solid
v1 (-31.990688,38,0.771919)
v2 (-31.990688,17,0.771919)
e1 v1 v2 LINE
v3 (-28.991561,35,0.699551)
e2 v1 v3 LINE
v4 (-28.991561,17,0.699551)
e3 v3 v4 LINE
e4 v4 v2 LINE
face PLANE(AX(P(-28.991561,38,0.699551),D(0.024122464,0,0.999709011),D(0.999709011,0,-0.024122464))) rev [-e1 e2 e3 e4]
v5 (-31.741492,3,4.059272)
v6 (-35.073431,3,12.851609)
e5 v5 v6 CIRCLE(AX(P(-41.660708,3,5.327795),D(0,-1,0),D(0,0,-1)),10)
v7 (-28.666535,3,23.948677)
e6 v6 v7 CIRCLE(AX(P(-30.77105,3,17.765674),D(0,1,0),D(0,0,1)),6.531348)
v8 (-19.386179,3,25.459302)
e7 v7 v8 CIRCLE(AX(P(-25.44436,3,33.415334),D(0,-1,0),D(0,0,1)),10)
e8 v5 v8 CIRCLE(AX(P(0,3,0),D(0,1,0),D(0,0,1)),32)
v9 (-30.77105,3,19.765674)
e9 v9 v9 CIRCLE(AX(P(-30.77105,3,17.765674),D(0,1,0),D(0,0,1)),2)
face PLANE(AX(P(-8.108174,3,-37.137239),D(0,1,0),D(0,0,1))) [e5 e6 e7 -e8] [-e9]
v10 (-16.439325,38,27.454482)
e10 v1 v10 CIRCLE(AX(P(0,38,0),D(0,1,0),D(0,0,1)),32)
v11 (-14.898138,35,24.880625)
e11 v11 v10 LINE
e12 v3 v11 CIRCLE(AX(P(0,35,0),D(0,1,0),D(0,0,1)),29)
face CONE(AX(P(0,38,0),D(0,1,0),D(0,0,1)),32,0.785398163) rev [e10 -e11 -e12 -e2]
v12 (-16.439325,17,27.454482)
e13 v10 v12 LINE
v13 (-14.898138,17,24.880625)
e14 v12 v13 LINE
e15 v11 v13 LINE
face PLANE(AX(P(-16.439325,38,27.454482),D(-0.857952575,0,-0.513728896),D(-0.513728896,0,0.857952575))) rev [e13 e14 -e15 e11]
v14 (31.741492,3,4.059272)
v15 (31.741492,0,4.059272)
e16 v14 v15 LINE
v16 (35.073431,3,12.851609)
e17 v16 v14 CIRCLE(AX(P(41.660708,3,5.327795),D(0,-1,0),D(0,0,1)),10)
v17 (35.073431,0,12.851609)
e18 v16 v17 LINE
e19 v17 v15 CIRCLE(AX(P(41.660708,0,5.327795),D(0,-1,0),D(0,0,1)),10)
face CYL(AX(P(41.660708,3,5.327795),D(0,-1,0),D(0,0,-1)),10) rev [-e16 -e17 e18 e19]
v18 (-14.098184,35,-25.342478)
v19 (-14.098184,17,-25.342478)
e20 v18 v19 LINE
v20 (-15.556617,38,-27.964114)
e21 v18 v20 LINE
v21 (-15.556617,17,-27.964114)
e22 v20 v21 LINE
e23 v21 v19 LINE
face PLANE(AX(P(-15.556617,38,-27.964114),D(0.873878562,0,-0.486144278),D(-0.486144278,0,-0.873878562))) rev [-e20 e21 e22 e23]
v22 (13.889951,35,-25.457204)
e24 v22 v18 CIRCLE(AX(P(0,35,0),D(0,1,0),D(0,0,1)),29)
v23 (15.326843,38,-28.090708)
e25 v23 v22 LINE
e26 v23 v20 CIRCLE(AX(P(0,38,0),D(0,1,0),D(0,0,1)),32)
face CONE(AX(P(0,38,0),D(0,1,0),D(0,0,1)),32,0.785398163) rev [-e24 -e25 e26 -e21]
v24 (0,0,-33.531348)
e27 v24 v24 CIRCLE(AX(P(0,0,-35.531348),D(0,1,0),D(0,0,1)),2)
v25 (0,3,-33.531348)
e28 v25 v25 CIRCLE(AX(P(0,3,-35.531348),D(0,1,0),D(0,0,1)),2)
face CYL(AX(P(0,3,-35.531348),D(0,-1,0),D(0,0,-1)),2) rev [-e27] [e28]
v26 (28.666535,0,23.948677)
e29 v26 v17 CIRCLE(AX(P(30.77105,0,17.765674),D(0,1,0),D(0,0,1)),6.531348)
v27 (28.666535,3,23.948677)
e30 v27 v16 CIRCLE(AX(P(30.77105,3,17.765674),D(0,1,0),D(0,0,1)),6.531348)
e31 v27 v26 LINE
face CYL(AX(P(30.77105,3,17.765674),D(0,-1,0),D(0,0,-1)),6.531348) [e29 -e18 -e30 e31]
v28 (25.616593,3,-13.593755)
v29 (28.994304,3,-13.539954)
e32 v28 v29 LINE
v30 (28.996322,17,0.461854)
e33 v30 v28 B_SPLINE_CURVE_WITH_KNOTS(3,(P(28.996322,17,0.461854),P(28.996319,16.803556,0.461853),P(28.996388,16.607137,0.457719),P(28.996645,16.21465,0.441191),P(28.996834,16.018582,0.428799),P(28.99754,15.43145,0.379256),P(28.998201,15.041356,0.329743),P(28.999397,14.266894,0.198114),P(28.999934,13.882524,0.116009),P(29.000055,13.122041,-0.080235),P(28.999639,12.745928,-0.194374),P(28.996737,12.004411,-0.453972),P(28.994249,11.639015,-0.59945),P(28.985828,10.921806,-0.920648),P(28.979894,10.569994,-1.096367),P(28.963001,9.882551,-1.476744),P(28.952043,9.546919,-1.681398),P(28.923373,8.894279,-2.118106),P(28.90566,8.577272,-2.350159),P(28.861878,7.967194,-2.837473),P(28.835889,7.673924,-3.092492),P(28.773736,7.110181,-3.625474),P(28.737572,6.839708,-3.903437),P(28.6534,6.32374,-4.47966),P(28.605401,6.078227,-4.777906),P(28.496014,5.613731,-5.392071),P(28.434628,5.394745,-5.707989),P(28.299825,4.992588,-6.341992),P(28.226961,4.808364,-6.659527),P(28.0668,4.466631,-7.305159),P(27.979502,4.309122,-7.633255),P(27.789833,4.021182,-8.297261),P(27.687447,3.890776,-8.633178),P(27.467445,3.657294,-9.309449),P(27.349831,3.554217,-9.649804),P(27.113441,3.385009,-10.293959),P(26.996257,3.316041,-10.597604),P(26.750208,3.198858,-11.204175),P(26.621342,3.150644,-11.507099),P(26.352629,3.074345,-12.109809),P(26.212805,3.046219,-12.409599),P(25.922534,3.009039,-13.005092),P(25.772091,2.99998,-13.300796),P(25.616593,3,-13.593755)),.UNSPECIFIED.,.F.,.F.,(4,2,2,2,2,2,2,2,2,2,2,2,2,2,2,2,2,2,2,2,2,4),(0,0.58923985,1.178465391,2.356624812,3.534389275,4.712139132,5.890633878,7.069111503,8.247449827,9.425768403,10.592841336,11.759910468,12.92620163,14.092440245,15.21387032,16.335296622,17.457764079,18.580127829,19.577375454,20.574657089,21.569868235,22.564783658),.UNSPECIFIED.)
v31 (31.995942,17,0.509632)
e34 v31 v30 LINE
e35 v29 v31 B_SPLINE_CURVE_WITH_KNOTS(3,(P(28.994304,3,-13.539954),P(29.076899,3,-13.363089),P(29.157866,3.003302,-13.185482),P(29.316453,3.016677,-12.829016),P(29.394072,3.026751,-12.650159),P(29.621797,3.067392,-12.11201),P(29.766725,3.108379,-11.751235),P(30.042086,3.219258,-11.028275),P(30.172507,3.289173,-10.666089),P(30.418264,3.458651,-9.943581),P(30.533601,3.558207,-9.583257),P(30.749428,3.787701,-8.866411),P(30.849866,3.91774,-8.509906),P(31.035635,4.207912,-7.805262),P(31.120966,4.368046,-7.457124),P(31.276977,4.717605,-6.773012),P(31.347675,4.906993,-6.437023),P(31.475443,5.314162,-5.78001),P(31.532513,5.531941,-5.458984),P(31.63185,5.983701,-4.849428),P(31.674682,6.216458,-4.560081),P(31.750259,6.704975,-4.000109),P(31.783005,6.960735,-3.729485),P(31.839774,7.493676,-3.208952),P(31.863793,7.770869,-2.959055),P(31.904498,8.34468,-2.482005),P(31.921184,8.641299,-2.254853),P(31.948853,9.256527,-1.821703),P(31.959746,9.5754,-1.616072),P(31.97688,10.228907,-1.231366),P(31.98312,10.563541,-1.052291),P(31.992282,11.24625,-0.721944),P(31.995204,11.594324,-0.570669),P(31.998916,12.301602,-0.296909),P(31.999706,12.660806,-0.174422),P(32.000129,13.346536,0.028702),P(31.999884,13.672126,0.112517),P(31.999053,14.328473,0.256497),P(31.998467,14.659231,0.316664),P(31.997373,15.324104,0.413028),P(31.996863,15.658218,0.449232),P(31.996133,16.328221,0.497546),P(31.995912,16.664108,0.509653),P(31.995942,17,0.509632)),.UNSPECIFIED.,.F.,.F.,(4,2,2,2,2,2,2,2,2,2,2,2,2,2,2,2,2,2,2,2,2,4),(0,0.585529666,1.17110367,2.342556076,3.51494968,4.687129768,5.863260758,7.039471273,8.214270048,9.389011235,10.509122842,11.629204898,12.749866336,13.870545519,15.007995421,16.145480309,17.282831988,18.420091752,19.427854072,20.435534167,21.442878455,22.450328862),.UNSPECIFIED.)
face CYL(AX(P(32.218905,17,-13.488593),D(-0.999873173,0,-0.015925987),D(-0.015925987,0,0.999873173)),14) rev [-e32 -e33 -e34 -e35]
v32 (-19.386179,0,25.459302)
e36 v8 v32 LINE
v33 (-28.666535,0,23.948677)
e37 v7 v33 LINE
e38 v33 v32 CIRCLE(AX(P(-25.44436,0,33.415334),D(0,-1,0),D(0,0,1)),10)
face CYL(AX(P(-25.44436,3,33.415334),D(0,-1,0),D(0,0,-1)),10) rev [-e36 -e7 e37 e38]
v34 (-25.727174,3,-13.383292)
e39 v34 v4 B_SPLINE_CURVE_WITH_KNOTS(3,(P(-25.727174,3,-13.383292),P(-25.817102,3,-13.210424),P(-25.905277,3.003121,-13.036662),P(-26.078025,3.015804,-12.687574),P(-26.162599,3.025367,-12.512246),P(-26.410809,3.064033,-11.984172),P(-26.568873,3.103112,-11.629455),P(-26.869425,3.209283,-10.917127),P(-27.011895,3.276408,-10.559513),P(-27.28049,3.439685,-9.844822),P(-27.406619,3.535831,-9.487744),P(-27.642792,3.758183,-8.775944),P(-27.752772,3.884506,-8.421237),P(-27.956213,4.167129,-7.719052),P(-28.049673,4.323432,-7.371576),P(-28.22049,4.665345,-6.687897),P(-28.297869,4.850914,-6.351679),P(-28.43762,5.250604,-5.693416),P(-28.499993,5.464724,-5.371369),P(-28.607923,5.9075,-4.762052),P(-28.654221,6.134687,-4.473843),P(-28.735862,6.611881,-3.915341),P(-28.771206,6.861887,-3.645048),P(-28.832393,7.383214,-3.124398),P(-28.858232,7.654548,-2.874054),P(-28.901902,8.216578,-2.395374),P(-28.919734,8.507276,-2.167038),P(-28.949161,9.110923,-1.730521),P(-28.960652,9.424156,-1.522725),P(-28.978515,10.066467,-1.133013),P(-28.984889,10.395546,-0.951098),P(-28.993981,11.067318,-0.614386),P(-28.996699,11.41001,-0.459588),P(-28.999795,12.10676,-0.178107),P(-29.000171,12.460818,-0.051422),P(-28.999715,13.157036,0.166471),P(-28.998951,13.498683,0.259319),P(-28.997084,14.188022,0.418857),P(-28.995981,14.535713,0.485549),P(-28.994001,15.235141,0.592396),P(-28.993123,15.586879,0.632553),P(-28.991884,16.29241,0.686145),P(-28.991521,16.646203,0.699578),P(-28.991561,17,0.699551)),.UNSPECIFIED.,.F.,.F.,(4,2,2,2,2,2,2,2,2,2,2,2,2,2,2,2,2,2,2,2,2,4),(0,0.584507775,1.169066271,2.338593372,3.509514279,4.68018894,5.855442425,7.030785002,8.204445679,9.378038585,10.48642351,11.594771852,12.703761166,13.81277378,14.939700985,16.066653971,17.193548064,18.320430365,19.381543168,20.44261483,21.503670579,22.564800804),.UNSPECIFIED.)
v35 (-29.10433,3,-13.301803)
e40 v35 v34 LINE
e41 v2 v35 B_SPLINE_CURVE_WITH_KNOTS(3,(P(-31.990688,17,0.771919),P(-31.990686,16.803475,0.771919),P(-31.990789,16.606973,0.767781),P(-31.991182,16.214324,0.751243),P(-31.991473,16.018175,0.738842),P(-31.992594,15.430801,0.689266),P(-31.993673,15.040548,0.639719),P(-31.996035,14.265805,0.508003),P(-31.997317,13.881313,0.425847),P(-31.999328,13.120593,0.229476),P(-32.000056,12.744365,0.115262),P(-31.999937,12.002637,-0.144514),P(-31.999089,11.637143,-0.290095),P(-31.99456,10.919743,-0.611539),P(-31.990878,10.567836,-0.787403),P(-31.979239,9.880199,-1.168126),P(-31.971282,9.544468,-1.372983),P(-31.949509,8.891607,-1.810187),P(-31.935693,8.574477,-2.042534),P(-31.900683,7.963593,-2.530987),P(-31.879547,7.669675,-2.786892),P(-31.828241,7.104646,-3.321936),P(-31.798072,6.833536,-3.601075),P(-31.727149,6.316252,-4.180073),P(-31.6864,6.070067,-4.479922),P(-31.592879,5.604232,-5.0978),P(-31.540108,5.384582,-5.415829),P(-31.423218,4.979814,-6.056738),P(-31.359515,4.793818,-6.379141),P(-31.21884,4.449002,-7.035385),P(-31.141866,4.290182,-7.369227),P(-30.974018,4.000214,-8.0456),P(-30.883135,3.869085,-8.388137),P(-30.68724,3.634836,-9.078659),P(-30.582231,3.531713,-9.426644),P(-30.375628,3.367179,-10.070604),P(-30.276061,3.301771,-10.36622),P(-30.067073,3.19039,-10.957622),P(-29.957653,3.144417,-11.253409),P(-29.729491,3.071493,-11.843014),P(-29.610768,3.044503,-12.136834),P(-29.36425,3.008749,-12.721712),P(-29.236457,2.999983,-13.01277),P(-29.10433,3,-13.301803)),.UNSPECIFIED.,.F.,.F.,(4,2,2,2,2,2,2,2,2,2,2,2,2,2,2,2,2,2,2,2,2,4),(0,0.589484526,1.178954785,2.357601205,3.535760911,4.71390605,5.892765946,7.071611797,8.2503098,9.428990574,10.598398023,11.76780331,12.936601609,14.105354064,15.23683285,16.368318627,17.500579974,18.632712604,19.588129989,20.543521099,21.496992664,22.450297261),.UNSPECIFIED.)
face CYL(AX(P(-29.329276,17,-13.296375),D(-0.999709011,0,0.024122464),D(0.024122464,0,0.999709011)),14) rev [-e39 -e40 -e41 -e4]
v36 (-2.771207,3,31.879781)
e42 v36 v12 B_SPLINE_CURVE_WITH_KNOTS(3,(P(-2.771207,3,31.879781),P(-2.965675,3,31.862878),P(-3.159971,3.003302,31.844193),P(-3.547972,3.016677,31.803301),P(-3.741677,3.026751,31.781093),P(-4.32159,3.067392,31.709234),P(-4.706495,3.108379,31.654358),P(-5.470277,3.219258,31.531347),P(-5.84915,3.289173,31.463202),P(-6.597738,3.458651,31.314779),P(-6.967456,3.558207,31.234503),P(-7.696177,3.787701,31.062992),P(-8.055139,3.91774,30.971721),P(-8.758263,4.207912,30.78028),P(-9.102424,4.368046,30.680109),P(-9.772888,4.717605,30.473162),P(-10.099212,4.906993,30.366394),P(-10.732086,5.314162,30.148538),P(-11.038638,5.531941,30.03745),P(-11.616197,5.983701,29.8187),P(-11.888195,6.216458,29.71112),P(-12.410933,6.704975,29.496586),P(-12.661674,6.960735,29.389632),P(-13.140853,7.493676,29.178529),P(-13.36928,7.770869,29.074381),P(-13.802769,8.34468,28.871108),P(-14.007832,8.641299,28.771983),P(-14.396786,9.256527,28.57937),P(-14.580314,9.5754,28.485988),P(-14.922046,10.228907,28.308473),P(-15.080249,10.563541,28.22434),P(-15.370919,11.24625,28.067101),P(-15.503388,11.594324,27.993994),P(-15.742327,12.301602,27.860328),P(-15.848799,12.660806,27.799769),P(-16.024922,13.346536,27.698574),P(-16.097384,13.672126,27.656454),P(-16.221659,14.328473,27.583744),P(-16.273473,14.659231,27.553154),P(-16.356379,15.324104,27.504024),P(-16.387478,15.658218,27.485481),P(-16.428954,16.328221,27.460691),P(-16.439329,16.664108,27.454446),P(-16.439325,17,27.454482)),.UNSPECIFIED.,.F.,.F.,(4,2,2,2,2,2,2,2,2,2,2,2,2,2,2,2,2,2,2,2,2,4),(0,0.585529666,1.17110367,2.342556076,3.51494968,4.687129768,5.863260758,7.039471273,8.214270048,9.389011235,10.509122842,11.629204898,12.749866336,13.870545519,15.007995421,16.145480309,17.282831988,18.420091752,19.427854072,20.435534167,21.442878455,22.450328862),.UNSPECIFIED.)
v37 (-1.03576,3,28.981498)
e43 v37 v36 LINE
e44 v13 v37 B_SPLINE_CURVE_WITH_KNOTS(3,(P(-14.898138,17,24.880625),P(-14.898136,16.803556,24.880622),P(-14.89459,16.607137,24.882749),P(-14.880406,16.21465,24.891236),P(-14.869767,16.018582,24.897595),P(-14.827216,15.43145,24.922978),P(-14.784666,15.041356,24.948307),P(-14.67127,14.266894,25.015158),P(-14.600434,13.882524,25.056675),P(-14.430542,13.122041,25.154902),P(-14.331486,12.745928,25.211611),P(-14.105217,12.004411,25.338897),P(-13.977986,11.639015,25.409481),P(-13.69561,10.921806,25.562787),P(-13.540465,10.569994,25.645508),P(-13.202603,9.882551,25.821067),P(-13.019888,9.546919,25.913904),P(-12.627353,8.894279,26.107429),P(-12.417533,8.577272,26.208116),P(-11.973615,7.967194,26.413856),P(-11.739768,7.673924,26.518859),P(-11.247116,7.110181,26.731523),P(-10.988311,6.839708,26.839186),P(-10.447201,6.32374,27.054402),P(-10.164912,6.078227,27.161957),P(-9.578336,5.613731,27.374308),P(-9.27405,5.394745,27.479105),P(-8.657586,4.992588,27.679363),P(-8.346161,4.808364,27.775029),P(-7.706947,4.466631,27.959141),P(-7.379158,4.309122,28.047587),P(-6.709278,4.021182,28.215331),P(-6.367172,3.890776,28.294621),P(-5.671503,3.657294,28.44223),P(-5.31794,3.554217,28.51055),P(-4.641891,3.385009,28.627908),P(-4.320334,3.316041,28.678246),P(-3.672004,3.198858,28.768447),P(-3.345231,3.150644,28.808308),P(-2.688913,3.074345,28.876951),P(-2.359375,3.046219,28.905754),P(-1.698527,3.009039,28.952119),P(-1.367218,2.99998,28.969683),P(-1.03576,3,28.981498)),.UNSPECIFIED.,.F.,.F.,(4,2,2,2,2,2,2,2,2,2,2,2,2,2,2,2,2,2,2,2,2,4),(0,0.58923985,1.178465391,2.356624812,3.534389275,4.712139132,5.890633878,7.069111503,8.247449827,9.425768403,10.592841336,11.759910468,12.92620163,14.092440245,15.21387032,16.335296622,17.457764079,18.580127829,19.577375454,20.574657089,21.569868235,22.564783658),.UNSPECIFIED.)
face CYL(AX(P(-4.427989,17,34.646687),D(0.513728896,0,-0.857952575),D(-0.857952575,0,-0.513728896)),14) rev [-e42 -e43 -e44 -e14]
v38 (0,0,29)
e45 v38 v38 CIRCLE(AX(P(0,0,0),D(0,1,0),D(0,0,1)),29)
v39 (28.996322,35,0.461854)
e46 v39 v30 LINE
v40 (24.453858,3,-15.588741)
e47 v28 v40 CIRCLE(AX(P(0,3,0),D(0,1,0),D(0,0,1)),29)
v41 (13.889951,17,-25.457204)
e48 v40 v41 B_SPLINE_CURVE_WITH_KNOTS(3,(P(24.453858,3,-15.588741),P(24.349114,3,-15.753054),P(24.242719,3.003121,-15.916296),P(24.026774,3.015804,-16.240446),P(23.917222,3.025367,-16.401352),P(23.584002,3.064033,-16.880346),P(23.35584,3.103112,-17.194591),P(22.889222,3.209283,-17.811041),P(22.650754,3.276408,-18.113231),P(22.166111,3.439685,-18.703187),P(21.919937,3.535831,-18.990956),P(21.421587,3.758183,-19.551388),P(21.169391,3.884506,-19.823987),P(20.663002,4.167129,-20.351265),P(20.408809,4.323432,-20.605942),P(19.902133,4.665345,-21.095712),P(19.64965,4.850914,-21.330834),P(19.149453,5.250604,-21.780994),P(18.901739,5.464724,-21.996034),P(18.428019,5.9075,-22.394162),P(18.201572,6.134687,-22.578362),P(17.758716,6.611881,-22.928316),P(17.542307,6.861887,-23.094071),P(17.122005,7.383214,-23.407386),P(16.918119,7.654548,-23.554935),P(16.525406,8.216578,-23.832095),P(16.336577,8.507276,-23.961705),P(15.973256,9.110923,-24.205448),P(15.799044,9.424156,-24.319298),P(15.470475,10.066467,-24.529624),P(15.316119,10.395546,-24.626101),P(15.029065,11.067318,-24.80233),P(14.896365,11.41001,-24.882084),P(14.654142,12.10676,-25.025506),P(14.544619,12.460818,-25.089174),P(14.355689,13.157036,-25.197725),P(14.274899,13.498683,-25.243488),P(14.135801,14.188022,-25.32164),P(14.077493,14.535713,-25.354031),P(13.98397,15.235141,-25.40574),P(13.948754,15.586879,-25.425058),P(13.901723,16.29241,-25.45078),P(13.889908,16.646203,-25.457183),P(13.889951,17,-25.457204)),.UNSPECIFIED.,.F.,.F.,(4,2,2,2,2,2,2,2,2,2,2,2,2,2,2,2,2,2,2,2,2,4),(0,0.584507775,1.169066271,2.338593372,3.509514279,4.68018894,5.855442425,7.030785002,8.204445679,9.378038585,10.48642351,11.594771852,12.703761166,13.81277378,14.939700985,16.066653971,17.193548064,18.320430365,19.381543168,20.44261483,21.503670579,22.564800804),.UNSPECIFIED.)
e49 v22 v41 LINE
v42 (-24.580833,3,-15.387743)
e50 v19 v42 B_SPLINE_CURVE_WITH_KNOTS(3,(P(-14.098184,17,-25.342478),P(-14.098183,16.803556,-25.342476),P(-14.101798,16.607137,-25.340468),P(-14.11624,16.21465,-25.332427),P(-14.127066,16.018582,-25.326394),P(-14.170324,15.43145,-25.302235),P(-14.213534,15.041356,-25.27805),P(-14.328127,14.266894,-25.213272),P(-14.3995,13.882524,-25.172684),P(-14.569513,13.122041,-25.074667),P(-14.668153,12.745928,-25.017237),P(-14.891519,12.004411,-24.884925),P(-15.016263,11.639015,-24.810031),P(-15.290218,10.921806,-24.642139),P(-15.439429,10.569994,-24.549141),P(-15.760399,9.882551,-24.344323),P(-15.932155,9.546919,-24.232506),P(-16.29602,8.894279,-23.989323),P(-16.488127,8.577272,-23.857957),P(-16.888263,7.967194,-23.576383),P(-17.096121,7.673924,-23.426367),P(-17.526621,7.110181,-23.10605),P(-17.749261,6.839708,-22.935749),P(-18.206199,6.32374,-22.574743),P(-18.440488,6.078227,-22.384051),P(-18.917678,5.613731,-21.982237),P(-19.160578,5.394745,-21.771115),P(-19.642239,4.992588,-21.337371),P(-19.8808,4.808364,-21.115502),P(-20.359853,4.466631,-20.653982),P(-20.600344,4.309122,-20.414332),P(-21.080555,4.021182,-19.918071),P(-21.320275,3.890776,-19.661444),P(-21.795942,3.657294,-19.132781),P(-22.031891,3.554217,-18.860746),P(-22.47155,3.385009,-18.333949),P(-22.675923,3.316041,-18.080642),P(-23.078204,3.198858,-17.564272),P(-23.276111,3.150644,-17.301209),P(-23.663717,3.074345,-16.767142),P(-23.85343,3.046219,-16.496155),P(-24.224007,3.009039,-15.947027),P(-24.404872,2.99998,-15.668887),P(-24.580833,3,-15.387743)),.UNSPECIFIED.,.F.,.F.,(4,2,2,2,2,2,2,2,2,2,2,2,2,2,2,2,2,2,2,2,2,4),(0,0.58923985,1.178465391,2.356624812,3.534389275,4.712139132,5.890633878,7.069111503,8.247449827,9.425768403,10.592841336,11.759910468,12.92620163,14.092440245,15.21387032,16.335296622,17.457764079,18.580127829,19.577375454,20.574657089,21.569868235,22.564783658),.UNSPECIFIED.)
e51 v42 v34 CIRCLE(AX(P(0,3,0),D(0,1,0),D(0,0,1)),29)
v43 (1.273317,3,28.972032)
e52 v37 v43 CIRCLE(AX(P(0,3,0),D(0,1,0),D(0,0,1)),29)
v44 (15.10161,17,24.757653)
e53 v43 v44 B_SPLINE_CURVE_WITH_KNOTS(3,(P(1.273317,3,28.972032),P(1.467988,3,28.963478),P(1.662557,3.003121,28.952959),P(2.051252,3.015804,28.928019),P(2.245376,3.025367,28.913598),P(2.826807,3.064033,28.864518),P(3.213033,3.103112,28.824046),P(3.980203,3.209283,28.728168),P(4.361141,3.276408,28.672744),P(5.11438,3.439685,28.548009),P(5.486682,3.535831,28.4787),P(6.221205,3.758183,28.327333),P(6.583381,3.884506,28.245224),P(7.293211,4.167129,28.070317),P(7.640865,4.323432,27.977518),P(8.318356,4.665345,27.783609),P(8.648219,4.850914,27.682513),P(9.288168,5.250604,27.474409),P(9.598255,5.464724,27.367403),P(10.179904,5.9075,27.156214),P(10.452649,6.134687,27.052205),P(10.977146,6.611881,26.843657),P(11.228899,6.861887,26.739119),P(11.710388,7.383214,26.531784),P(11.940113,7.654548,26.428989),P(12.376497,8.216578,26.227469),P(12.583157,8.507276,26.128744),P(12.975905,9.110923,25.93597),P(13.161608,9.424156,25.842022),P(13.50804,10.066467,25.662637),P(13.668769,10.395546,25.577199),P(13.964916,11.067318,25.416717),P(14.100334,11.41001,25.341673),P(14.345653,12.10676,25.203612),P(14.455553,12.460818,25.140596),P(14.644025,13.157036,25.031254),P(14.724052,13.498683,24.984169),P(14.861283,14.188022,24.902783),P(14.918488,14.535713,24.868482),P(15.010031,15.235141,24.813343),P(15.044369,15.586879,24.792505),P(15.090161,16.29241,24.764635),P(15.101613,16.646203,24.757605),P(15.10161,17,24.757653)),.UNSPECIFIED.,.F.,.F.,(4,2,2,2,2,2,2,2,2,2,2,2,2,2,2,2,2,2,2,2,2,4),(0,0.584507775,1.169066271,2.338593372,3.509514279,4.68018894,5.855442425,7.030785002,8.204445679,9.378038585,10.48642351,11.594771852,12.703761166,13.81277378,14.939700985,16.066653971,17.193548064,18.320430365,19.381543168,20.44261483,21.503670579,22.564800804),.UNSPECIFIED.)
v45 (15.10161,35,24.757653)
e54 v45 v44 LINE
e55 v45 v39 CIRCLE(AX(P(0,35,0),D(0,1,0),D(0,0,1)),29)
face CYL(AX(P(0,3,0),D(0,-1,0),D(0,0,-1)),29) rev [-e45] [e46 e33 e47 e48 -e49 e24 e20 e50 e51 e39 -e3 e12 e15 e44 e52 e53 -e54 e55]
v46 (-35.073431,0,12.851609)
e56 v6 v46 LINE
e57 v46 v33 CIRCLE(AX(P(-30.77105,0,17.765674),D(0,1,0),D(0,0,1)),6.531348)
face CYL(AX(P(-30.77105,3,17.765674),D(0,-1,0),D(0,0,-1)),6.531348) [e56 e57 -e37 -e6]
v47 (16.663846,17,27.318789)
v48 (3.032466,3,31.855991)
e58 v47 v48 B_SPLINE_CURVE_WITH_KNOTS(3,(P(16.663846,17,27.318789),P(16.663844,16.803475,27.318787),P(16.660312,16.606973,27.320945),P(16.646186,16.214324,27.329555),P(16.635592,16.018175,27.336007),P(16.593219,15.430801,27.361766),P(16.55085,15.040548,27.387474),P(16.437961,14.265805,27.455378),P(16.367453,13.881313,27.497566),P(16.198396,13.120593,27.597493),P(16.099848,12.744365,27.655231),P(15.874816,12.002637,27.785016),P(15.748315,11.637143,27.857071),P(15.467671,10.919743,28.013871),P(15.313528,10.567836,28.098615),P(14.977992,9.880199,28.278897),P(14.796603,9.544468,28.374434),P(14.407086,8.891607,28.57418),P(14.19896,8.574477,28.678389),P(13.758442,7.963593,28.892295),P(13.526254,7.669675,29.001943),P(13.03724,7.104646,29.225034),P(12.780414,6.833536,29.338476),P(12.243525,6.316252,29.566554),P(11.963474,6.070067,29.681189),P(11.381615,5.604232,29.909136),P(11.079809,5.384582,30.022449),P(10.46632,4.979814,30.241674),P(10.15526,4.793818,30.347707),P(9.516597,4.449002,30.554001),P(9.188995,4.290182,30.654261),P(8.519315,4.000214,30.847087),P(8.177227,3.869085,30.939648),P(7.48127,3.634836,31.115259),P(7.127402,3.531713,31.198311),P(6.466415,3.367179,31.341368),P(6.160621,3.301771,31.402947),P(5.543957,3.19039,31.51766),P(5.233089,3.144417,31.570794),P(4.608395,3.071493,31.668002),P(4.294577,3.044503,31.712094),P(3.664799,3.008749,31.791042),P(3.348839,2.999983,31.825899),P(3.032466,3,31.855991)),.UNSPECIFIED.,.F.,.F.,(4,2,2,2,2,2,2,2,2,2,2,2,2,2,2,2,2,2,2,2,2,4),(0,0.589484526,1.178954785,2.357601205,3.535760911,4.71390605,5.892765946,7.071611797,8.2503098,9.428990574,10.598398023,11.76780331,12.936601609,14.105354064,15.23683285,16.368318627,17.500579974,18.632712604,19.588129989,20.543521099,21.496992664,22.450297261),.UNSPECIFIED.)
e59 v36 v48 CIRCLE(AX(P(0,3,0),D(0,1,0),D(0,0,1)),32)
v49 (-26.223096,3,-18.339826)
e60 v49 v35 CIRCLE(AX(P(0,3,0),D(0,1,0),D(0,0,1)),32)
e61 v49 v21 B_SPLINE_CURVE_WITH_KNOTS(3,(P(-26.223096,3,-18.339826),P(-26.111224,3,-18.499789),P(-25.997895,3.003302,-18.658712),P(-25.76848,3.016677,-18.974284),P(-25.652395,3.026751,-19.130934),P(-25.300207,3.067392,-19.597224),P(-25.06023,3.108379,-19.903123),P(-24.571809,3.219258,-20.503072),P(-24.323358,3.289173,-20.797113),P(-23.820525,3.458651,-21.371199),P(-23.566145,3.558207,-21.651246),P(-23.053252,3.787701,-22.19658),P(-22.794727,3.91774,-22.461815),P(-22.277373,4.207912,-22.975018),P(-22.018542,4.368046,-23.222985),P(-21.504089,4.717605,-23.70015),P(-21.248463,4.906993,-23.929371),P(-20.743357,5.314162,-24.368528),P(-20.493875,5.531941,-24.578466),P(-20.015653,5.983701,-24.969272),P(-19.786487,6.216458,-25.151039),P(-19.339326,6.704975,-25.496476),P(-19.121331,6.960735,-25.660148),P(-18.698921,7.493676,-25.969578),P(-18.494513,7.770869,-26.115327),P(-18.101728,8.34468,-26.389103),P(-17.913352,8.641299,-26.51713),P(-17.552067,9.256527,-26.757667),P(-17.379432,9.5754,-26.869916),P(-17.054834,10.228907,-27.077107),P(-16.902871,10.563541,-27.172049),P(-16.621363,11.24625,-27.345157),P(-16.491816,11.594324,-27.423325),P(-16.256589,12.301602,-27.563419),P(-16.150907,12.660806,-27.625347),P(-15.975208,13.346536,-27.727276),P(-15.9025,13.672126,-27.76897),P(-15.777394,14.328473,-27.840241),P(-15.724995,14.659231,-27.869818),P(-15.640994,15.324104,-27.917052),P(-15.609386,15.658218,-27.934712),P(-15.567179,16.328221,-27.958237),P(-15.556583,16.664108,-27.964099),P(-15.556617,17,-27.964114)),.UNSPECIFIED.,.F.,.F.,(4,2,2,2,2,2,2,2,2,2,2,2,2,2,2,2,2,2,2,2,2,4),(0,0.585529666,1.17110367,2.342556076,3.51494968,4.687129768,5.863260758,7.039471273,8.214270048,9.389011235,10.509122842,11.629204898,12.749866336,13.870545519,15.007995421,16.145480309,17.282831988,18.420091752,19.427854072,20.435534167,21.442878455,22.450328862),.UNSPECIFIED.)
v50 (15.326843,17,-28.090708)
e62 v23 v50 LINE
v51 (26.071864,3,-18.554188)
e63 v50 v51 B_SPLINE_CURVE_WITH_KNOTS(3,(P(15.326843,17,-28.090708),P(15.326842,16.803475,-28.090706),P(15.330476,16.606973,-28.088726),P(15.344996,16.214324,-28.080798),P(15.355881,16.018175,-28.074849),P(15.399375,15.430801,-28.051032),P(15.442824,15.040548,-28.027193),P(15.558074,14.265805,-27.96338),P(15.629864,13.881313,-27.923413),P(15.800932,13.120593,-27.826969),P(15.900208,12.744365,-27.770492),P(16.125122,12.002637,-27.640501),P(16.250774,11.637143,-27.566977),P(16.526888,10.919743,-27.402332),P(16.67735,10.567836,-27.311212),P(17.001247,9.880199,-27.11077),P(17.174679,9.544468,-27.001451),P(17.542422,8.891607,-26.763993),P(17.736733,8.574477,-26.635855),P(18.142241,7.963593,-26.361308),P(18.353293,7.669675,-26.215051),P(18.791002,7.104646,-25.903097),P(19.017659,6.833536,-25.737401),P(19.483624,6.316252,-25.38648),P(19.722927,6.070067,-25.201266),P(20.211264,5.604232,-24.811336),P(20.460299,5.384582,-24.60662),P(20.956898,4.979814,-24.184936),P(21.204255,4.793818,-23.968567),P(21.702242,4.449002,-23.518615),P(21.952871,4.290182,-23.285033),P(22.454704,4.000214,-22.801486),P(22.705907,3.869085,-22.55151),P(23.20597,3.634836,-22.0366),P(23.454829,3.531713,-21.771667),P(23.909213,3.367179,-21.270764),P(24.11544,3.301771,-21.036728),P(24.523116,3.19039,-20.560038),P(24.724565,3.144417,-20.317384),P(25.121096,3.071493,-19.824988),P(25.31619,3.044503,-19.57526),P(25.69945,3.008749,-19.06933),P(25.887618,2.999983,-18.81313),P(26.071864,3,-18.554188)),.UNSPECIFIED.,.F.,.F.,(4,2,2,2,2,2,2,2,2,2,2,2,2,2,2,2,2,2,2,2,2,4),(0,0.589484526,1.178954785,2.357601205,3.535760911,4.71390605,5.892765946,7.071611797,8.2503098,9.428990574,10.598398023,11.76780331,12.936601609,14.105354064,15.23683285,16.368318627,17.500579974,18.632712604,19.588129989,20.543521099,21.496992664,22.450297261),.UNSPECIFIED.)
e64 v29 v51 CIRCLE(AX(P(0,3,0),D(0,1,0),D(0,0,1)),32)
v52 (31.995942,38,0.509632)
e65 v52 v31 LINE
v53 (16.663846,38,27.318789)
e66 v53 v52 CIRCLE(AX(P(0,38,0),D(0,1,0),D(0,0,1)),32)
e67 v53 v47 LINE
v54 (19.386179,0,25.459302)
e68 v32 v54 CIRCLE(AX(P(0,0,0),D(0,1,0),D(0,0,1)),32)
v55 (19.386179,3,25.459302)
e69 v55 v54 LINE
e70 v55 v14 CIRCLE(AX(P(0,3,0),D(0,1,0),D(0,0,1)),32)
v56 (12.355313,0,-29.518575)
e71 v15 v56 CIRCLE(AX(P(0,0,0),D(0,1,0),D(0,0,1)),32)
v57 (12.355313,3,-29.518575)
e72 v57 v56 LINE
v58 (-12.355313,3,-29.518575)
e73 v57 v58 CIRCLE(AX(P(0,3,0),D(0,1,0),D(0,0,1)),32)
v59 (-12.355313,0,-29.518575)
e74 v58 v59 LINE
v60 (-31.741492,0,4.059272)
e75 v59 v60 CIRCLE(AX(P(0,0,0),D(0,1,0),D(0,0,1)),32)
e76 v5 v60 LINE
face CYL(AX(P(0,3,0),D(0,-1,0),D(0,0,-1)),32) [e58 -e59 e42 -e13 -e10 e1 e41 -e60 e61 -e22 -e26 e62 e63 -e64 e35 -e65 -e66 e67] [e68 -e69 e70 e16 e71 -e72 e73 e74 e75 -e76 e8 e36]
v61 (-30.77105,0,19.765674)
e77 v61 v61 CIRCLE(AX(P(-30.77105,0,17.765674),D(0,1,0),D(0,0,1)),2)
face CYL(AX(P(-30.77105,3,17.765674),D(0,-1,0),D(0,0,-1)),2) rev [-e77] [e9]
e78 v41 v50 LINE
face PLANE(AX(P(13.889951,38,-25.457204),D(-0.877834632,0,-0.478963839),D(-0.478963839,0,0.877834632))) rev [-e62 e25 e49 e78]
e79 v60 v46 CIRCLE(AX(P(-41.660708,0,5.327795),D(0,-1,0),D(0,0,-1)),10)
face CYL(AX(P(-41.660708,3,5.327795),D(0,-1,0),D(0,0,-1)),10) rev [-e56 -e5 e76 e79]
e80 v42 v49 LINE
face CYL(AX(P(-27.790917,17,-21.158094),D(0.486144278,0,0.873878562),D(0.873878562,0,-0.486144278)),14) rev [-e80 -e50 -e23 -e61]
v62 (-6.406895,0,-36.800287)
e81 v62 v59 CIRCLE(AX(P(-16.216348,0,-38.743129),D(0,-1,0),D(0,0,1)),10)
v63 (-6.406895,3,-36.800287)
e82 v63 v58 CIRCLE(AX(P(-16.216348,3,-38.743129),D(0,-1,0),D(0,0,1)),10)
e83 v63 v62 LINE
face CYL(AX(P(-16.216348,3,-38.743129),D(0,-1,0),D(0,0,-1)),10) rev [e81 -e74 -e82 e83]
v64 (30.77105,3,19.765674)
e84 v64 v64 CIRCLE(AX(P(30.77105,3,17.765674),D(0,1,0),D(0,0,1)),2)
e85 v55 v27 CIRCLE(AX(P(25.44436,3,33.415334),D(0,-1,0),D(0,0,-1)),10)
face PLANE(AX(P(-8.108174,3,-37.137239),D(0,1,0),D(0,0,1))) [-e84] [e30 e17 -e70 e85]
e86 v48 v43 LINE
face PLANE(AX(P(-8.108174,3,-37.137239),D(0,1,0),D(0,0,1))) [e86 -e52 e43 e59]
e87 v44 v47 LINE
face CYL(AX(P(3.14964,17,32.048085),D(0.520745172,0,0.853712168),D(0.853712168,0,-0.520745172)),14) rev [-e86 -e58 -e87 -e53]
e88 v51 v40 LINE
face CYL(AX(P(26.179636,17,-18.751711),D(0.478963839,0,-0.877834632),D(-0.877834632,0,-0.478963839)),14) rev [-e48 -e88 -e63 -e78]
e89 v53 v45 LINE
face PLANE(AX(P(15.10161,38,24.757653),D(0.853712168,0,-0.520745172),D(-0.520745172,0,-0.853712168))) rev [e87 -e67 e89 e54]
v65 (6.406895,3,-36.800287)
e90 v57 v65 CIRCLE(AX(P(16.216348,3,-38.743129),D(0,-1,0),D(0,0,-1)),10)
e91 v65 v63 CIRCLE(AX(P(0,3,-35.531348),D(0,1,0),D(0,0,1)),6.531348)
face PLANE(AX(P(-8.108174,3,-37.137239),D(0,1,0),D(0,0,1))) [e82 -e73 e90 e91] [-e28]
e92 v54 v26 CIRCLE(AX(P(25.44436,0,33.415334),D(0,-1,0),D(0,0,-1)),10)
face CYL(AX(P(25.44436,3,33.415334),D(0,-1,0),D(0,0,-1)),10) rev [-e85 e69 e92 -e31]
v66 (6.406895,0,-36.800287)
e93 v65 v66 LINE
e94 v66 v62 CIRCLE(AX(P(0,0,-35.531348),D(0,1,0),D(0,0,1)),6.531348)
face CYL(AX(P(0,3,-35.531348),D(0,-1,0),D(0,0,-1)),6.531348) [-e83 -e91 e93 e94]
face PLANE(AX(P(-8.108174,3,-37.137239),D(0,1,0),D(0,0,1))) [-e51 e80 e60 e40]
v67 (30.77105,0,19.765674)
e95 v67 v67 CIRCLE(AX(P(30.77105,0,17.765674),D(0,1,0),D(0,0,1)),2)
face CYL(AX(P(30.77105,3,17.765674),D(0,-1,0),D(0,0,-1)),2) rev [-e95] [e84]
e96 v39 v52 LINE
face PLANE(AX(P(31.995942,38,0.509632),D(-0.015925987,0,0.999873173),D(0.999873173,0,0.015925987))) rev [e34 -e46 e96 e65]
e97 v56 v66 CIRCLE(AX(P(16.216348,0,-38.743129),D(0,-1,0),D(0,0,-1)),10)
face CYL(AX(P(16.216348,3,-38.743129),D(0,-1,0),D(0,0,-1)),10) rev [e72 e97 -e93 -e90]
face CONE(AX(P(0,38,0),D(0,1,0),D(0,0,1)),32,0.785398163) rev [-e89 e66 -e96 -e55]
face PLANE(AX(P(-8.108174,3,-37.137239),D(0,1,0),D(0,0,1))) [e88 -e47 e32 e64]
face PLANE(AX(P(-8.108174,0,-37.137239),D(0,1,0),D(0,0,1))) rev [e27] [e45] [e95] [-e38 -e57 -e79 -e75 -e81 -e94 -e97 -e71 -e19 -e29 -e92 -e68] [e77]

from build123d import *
from build123d.topology import SkipClean

# Parameters (mm, degrees)
SKETCH1_R           = 29
SKETCH1_R_2         = 2.0000000000000013
SKETCH1_R_3         = 2.00000000000017
SKETCH1_R_4         = 2.0000000000003304
BOSS_EXTRUDE1_DEPTH = 3
BOSS_EXTRUDE2_DEPTH = 35
FILLET1_R           = 14
CHAMFER1_SIZE       = 3


# Some blends are built 0.0001 mm under size
with BuildPart() as part:
    # Sketch1 → Boss-Extrude1 (new body)
    with BuildSketch(Plane(origin=(0, 0, 0), x_dir=(1, 0, 0), z_dir=(0, 1, 0))):
        with BuildLine():
            ThreePointArc((-12.355312859352809, 29.51857456157921), (-27.71281292110204, 15.999999999999998), (-31.741491883509095, -4.0592724728855325))
            ThreePointArc((-31.741491883509095, -4.0592724728855325), (-32.309645144827726, -8.871468590740253), (-35.073430755727436, -12.851609128714605))
            ThreePointArc((-35.073430755727436, -12.851609128714605), (-36.427364069331304, -21.031348451296957), (-28.666535362838538, -23.948677467977124))
            ThreePointArc((-28.666535362838538, -23.948677467977124), (-23.83773974087064, -23.54523918731126), (-19.38617902415628, -25.4593020886937))
            ThreePointArc((-19.38617902415628, -25.4593020886937), (1.617e-14, -32.00000000000001), (19.386179024156295, -25.45930208869368))
            ThreePointArc((19.386179024156295, -25.45930208869368), (23.837739740870653, -23.54523918731124), (28.666535362838555, -23.948677467977113))
            ThreePointArc((28.666535362838555, -23.948677467977113), (36.427364069331325, -21.031348451296928), (35.07343075572746, -12.851609128714571))
            ThreePointArc((35.07343075572746, -12.851609128714571), (32.30964514482773, -8.87146859074023), (31.741491883509102, -4.059272472885512))
            ThreePointArc((31.741491883509102, -4.059272472885512), (27.712812921102042, 16.000000000000007), (12.355312859352809, 29.518574561579204))
            ThreePointArc((12.355312859352809, 29.518574561579204), (8.47190540395708, 32.41670777805148), (6.4068953928889005, 36.8002865966917))
            ThreePointArc((6.4068953928889005, 36.8002865966917), (4.75e-15, 42.06269690259387), (-6.406895392888902, 36.800286596691706))
            ThreePointArc((-6.406895392888902, 36.800286596691706), (-8.471905403957084, 32.41670777805149), (-12.355312859352809, 29.51857456157921))
        make_face()
        with Locations(Location((0, 0, 0), (0, 0, 270))):
            Circle(SKETCH1_R, mode=Mode.SUBTRACT)
        with Locations(Location((0, 35.53134845129693, 0), (0, 0, 270))):
            Circle(SKETCH1_R_2, mode=Mode.SUBTRACT)
        with Locations(Location((30.771050389540026, -17.76567422564846, 0), (0, 0, 270))):
            Circle(SKETCH1_R_3, mode=Mode.SUBTRACT)
        with Locations(Location((-30.771050389540008, -17.765674225648485, 0), (0, 0, 270))):
            Circle(SKETCH1_R_4, mode=Mode.SUBTRACT)
    extrude(amount=BOSS_EXTRUDE1_DEPTH)

    # Sketch2 → Boss-Extrude2 (add)
    with SkipClean():  # the faces are left unmerged after this step: merging them gives an invalid solid
        with BuildSketch(Plane(origin=(0, 3, 0), x_dir=(1, 0, 0), z_dir=(0, 1, 0))):
            with BuildLine():
                Line((-15.556616883168559, 27.964113988294258), (-14.098184050372366, 25.34247830189322))
                ThreePointArc((-14.098184050372366, 25.34247830189322), (-0.11887275101926295, 28.999756365686377), (13.88995133460985, 25.457204322593487))
                Line((13.88995133460985, 25.457204322593487), (15.326842851982352, 28.09070821803249))
                ThreePointArc((15.326842851982352, 28.09070821803249), (-0.13116993215917874, 31.99973116213475), (-15.556616883168559, 27.964113988294258))
            make_face()
            with BuildLine():
                Line((-28.991561320001907, -0.699551448195039), (-31.990688353103597, -0.7719188393875828))
                ThreePointArc((-31.990688353103597, -0.7719188393875828), (-27.646995134601628, -16.1134620745299), (-16.439324666602317, -27.454482411913002))
                Line((-16.439324666602317, -27.454482411913002), (-14.898137979109256, -24.88062468579768))
                ThreePointArc((-14.898137979109256, -24.88062468579768), (-25.055089340734252, -14.602825005043623), (-28.991561320001907, -0.699551448195039))
            make_face()
            with BuildLine():
                Line((31.995941549770887, -0.5096315763812559), (28.996322029481636, -0.46185361609554243))
                ThreePointArc((28.996322029481636, -0.46185361609554243), (25.173962091753527, -14.396931360642762), (15.101609985392061, -24.757652874398442))
                Line((15.101609985392061, -24.757652874398442), (16.663845501121262, -27.318789378644897))
                ThreePointArc((16.663845501121262, -27.318789378644897), (27.778165066760824, -15.88626908760484), (31.995941549770887, -0.5096315763812559))
            make_face()
        extrude(amount=BOSS_EXTRUDE2_DEPTH)

    # Fillet1
    # the kernel refuses this fillet: 14 mm, written as the material it adds along each edge
    with BuildSketch(Plane(origin=(-32.57166659913419, 3, -58.5498636629911), x_dir=(0, 1, 0), z_dir=(0.486144277599018, 0, 0.8738785621341955))) as fillet1_piece_1_section:
        with BuildLine():
            CenterArc((FILLET1_R, FILLET1_R), FILLET1_R, 180.00000000000003, 90)
            Line((0, FILLET1_R), (0, 0))
            Line((0, 0), (FILLET1_R, 0))
        make_face()
    fillet1_piece_1 = extrude(amount=72.99999999999824, mode=Mode.PRIVATE)
    fillet1_piece_1 = fillet1_piece_1 & Plane(origin=(1.377e-14, 6.144013210194413, -4.086e-14), x_dir=(0.4789638391244486, 0, -0.877834631813515), z_dir=(0, -1, 0)) * Cylinder(31.99999999999996, 202, mode=Mode.PRIVATE)
    fillet1_piece_1 = fillet1_piece_1 - Plane(origin=(0, 6.144013210194413, 0), x_dir=(-1.8e-16, 0, 1), z_dir=(0, -1, 0)) * Cylinder(29, 202, mode=Mode.PRIVATE)
    add(fillet1_piece_1)
    with BuildSketch(Plane(origin=(-2.8737830347458213, 3, 5.267007790879544), x_dir=(0.8778346318135153, 0, 0.4789638391244479), z_dir=(0.4789638391244479, 0, -0.8778346318135153))) as fillet1_piece_2_section:
        with BuildLine():
            CenterArc((FILLET1_R, -FILLET1_R), FILLET1_R, 90, 90)
            Line((-2.37e-15, -FILLET1_R), (0, 0))
            Line((0, 0), (FILLET1_R, 0))
        make_face()
    fillet1_piece_2 = extrude(amount=72.99999999999824, mode=Mode.PRIVATE)
    fillet1_piece_2 = fillet1_piece_2 & Plane(origin=(5.151e-14, 6.1440139073006, -2.487e-14), x_dir=(0.9919216213596592, 0, 0.12685226477767322), z_dir=(0, -1, 0)) * Cylinder(31.999999999999954, 202, mode=Mode.PRIVATE)
    fillet1_piece_2 = fillet1_piece_2 - Plane(origin=(0, 6.1440139073006, 0), x_dir=(-1.8e-16, 0, 1), z_dir=(0, -1, 0)) * Cylinder(29, 202, mode=Mode.PRIVATE)
    add(fillet1_piece_2)
    with BuildSketch(Plane(origin=(66.99150261983281, 3, 1.0670411130482422), x_dir=(0.015925986761913882, 0, -0.9998731734303402), z_dir=(-0.9998731734303404, 0, -0.015925986761913886))) as fillet1_piece_3_section:
        with BuildLine():
            CenterArc((FILLET1_R, -FILLET1_R), FILLET1_R, 90, 90)
            Line((0, -FILLET1_R), (0, 0))
            Line((0, 0), (FILLET1_R, 0))
        make_face()
    fillet1_piece_3 = extrude(amount=72.99999999999828, mode=Mode.PRIVATE)
    fillet1_piece_3 = fillet1_piece_3 & Plane(origin=(5.151e-14, 6.144014691753946, -2.487e-14), x_dir=(0.9919216213596592, 0, 0.12685226477767322), z_dir=(0, -1, 0)) * Cylinder(31.999999999999954, 202, mode=Mode.PRIVATE)
    fillet1_piece_3 = fillet1_piece_3 - Plane(origin=(0, 6.144014691753946, 0), x_dir=(-1.8e-16, 0, 1), z_dir=(0, -1, 0)) * Cylinder(29, 202, mode=Mode.PRIVATE)
    add(fillet1_piece_3)
    with BuildSketch(Plane(origin=(-3.124471031459313, 3, -5.122273008494407), x_dir=(0, 1, 0), z_dir=(0.5207451719100392, 0, 0.8537121680826528))) as fillet1_piece_4_section:
        with BuildLine():
            CenterArc((FILLET1_R, FILLET1_R), FILLET1_R, 180, 90)
            Line((0, FILLET1_R), (0, 0))
            Line((0, 0), (FILLET1_R, 0))
        make_face()
    fillet1_piece_4 = extrude(amount=72.99999999999824, mode=Mode.PRIVATE)
    fillet1_piece_4 = fillet1_piece_4 & Plane(origin=(1.066e-14, 6.144012485408136, 2.132e-14), x_dir=(0.5207451719100394, 0, 0.8537121680826528), z_dir=(0, -1, 0)) * Cylinder(31.999999999999986, 202, mode=Mode.PRIVATE)
    fillet1_piece_4 = fillet1_piece_4 - Plane(origin=(0, 6.144012485408136, 0), x_dir=(-1.8e-16, 0, 1), z_dir=(0, -1, 0)) * Cylinder(29, 202, mode=Mode.PRIVATE)
    add(fillet1_piece_4)
    with BuildSketch(Plane(origin=(5.998254066205156, 3, -0.1447347823851374), x_dir=(-0.024122463730862184, 0, -0.9997090110344876), z_dir=(-0.9997090110344876, 0, 0.024122463730862184))) as fillet1_piece_5_section:
        with BuildLine():
            CenterArc((FILLET1_R, -FILLET1_R), FILLET1_R, 90, 90)
            Line((-1.64e-15, -FILLET1_R), (0, 0))
            Line((0, 0), (FILLET1_R, 0))
        make_face()
    fillet1_piece_5 = extrude(amount=72.99999999999821, mode=Mode.PRIVATE)
    fillet1_piece_5 = fillet1_piece_5 & Plane(origin=(-8.88e-15, 6.144013907117808, -9.33e-15), x_dir=(-0.3861035268547751, 0, -0.9224554550493503), z_dir=(0, -1, 0)) * Cylinder(31.999999999999986, 202, mode=Mode.PRIVATE)
    fillet1_piece_5 = fillet1_piece_5 - Plane(origin=(0, 6.144013907117808, 0), x_dir=(-1.8e-16, 0, 1), z_dir=(0, -1, 0)) * Cylinder(29, 202, mode=Mode.PRIVATE)
    add(fillet1_piece_5)
    with BuildSketch(Plane(origin=(-34.41983602069866, 3, 57.48282254994282), x_dir=(0.8579525753722805, 0, 0.513728895831324), z_dir=(0.513728895831324, 0, -0.8579525753722805))) as fillet1_piece_6_section:
        with BuildLine():
            CenterArc((FILLET1_R, -FILLET1_R), FILLET1_R, 90, 90)
            Line((3.65e-15, -FILLET1_R), (0, 0))
            Line((0, 0), (FILLET1_R, 0))
        make_face()
    fillet1_piece_6 = extrude(amount=72.99999999999822, mode=Mode.PRIVATE)
    fillet1_piece_6 = fillet1_piece_6 & Plane(origin=(-7.99e-15, 6.144014691708705, 8.88e-15), x_dir=(-0.6058180945048837, 0, 0.795603190271678), z_dir=(0, -1, 0)) * Cylinder(31.999999999999996, 202, mode=Mode.PRIVATE)
    fillet1_piece_6 = fillet1_piece_6 - Plane(origin=(0, 6.144014691708705, 0), x_dir=(-1.8e-16, 0, 1), z_dir=(0, -1, 0)) * Cylinder(29, 202, mode=Mode.PRIVATE)
    add(fillet1_piece_6)

    # Chamfer1
    chamfer1_edges = [part.edges().sort_by_distance(p)[0] for p in [
        (-0.1188727510192642, 38, -28.999756365686377),
        (25.173962091753527, 38, 14.39693136064276),
        (-25.055089340734256, 38, 14.60282500504362),
    ]]
    chamfer(chamfer1_edges, length=CHAMFER1_SIZE - 0.0001)  # a hair under: the kernel refuses the full size


solid = part.part
